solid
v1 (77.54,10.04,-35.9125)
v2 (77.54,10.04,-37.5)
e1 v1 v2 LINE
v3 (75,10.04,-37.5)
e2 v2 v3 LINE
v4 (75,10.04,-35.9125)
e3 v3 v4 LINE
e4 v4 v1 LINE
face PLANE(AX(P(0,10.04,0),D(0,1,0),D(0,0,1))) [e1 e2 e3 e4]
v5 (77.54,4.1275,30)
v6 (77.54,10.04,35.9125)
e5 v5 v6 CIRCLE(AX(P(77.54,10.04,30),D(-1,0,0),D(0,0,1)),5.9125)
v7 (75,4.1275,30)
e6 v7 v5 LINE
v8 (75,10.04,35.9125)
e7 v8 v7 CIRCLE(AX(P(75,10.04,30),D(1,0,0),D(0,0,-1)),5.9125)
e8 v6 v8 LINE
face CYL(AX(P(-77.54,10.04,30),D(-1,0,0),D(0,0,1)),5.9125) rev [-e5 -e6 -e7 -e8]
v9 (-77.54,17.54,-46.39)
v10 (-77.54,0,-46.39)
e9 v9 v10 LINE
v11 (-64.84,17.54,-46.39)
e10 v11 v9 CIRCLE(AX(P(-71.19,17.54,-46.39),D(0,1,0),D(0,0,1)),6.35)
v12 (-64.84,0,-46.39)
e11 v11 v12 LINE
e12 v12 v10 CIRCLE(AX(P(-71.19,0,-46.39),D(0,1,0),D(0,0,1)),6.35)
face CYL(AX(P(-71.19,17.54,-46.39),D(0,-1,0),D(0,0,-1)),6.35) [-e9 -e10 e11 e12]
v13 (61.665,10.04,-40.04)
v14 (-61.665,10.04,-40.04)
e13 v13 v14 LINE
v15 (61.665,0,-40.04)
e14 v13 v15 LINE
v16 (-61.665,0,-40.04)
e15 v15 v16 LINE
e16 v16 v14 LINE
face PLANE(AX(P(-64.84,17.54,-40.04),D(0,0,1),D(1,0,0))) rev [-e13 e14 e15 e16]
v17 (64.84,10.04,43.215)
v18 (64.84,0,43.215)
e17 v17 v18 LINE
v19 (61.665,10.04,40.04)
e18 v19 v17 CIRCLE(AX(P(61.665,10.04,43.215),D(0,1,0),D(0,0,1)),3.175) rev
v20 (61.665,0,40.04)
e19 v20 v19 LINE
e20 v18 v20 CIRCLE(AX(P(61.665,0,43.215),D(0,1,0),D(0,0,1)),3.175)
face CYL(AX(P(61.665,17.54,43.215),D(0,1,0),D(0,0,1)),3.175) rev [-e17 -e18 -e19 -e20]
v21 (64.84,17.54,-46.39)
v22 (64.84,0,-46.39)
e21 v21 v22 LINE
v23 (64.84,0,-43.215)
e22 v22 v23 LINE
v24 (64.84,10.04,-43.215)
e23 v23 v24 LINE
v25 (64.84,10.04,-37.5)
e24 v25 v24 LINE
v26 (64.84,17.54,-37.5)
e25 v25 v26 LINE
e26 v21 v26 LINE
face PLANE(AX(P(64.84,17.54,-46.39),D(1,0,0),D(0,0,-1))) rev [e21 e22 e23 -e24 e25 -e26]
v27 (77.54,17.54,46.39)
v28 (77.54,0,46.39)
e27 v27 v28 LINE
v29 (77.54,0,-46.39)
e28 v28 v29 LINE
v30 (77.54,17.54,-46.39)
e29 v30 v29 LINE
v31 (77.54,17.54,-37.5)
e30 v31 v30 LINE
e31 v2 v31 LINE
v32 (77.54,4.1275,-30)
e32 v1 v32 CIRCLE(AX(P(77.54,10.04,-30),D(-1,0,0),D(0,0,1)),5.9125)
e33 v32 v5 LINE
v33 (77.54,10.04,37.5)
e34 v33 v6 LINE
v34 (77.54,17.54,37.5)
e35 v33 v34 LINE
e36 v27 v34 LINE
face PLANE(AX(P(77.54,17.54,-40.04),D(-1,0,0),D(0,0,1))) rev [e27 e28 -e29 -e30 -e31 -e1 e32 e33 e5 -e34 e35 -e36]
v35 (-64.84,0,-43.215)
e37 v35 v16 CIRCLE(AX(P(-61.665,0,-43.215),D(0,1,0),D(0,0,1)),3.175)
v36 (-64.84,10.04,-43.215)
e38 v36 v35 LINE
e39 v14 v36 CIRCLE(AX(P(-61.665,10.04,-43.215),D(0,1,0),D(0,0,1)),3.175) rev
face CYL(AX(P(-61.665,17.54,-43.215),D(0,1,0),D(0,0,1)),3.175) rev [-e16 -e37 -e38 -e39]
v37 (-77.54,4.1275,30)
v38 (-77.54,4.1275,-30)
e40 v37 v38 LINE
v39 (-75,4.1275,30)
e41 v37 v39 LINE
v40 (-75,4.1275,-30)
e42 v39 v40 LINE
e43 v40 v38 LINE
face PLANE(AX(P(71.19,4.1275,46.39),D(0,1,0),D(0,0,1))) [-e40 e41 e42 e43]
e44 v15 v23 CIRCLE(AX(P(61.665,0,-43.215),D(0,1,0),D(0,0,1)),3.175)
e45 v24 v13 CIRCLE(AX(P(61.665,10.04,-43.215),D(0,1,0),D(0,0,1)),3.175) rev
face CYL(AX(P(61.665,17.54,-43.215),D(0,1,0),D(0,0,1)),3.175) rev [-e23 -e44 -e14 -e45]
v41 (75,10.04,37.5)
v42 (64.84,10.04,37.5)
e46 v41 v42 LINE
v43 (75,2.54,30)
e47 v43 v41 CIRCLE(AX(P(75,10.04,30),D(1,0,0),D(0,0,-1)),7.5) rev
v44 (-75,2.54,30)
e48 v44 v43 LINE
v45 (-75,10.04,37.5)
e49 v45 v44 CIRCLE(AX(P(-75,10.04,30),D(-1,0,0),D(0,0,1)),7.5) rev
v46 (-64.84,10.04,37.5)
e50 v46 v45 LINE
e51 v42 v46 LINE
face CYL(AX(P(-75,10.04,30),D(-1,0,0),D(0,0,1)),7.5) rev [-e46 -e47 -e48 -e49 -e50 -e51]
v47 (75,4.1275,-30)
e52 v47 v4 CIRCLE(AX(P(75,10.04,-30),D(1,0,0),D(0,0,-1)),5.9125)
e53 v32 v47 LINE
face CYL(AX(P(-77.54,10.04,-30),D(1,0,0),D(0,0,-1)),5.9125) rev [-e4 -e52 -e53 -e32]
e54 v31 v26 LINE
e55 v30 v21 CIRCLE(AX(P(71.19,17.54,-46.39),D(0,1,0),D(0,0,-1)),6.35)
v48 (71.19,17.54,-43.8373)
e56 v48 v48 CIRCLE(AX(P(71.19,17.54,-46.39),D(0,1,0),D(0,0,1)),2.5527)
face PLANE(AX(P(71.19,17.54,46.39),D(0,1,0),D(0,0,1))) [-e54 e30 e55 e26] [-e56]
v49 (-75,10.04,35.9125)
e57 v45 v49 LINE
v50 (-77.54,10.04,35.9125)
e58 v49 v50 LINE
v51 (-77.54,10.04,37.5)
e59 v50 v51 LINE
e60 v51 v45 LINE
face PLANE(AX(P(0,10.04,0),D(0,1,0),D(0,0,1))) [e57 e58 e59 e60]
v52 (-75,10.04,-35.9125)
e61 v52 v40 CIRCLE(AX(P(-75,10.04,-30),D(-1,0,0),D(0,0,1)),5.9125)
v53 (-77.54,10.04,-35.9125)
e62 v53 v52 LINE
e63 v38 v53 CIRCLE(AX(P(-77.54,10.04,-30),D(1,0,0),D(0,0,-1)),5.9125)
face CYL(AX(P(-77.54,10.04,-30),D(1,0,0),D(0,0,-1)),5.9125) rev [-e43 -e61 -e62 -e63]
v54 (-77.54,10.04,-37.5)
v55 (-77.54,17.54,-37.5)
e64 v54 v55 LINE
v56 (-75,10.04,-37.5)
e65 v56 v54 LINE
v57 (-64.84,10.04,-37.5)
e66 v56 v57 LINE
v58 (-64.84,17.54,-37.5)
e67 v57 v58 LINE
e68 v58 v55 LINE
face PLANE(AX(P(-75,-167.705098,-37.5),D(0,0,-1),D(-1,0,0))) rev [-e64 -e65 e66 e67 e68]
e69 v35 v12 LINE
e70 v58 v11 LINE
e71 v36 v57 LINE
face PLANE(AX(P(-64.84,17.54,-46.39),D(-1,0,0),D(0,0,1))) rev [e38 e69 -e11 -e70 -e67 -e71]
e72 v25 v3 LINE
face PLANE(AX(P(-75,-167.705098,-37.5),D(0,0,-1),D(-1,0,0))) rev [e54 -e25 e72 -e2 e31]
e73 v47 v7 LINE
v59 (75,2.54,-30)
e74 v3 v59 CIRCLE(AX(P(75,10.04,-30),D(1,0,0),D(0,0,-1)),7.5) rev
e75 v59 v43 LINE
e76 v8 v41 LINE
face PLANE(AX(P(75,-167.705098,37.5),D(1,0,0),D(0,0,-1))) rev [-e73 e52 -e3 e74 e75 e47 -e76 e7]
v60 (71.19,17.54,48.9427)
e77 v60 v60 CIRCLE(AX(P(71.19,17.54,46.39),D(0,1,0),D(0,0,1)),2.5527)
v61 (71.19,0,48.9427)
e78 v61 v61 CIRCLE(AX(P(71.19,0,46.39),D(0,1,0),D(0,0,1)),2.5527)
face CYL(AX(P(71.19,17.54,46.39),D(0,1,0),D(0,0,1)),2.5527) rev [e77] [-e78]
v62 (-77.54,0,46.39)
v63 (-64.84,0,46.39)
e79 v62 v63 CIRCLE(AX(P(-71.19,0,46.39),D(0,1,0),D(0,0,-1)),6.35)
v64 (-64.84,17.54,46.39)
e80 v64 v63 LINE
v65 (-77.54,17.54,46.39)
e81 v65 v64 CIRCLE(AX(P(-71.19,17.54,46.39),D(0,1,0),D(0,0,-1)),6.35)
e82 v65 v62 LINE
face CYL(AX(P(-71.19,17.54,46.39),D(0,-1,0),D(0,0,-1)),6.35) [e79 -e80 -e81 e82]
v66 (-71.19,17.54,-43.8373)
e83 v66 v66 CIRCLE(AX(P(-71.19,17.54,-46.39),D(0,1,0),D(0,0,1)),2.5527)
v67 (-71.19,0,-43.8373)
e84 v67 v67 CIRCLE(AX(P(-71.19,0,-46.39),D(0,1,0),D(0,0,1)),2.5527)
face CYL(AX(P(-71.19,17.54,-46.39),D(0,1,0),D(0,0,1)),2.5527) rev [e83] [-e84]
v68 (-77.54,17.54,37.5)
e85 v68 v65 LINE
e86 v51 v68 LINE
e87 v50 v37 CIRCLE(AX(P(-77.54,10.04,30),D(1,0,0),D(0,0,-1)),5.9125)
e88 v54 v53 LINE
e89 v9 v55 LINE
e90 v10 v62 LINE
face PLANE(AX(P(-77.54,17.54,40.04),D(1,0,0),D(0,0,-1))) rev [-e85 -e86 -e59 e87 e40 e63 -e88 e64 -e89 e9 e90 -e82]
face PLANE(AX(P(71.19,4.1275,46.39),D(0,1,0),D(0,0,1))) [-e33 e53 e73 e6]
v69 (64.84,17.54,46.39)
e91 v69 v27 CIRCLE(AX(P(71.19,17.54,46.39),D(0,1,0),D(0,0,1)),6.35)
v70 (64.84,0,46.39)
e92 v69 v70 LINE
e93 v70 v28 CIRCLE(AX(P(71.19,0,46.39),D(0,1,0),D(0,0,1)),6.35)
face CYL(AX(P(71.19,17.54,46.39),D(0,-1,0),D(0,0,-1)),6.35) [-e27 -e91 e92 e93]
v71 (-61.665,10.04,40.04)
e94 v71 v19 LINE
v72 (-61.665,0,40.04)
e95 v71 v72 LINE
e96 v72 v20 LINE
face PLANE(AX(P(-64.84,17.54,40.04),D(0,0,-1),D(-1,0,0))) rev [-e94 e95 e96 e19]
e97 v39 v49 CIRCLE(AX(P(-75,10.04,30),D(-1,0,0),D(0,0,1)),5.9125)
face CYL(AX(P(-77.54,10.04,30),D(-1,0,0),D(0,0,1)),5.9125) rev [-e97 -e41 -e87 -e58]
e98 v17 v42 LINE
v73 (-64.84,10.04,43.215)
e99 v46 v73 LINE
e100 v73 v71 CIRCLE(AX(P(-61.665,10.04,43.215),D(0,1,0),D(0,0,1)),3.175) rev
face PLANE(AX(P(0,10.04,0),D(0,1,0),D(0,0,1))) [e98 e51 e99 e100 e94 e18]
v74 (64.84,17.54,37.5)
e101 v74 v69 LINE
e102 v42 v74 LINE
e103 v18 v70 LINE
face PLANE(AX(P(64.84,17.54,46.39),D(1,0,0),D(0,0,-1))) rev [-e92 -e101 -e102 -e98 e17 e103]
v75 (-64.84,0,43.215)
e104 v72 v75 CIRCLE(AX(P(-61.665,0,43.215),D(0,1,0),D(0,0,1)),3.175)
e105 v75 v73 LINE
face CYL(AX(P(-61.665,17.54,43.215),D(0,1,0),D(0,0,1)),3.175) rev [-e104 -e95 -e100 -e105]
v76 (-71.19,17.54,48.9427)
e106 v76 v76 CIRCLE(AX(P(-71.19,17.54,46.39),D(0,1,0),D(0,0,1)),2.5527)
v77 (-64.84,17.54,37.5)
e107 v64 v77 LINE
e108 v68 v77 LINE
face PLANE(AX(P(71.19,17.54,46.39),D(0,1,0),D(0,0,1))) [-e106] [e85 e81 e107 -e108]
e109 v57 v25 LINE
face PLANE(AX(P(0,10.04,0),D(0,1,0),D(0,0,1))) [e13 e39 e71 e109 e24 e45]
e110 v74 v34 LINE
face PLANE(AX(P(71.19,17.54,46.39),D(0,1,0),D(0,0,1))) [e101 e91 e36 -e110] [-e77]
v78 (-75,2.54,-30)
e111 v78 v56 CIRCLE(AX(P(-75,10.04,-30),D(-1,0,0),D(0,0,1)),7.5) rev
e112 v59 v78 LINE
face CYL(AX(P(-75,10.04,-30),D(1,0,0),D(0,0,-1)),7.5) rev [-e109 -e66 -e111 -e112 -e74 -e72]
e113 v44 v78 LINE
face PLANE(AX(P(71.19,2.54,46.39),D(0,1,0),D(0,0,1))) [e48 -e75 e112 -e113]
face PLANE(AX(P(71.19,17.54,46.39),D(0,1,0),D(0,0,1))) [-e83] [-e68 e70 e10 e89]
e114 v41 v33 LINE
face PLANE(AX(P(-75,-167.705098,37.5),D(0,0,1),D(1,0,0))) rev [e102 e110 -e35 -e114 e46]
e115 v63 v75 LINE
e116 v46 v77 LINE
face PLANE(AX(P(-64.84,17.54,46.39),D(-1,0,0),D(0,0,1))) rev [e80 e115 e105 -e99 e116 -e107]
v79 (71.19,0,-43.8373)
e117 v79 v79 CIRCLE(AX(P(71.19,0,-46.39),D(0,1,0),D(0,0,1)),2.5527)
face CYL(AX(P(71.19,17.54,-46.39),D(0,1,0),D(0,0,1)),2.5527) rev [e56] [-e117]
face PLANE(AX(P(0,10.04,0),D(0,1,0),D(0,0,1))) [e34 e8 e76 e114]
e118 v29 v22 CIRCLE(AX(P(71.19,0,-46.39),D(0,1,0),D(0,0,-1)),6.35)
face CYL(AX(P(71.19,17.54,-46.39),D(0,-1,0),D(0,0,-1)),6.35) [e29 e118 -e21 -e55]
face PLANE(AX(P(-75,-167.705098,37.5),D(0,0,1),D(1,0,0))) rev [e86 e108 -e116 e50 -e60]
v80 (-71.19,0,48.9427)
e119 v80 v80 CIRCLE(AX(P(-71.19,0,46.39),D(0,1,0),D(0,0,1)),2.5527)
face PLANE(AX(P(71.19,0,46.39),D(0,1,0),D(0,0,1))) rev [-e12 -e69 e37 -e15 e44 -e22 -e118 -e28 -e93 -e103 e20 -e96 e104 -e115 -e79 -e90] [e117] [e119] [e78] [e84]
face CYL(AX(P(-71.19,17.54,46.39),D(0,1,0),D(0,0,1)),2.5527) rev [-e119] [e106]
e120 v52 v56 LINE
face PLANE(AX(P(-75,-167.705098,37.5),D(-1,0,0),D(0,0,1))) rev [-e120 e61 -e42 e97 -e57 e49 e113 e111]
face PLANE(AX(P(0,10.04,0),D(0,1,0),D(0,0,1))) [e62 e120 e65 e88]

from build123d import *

# Parameters (mm, degrees)
BOSS_EXTRUDE1_DEPTH    = 17.539999972
F_10_CLEARANCE_HOLE1_D = 5.1054
SKETCH3_W              = 150
SKETCH3_H              = 75
CUT_EXTRUDE1_DEPTH     = 14.999999972
SKETCH4_W              = 155.08
SKETCH4_H              = 71.825
CUT_EXTRUDE2_DEPTH     = 13.412499972
CUT_EXTRUDE3_DEPTH     = 7.5
FILLET2_R              = 5.9125
FILLET1_R              = 7.5
FILLET3_R              = 3.175


with BuildPart() as part:
    # Sketch1 → Boss-Extrude1 (new body)
    with BuildSketch(Plane(origin=(0, 0, 0), x_dir=(1, 0, 0), z_dir=(0, 1, 0))):
        with BuildLine():
            Line((77.54, -40.04), (77.54, 40.04))
            Line((77.54, 40.04), (77.54, 46.39))
            ThreePointArc((77.54, 46.39), (71.19, 52.74), (64.84, 46.39))
            Line((64.84, 46.39), (64.84, 40.04))
            Line((64.84, 40.04), (-64.84, 40.04))
            Line((-64.84, 40.04), (-64.84, 46.39))
            ThreePointArc((-64.84, 46.39), (-71.19, 52.74), (-77.54, 46.39))
            Line((-77.54, 46.39), (-77.54, 40.04))
            Line((-77.54, 40.04), (-77.54, -40.04))
            Line((-77.54, -40.04), (-77.54, -46.39))
            ThreePointArc((-77.54, -46.39), (-71.19, -52.74), (-64.84, -46.39))
            Line((-64.84, -46.39), (-64.84, -40.04))
            Line((-64.84, -40.04), (64.84, -40.04))
            Line((64.84, -40.04), (64.84, -46.39))
            ThreePointArc((64.84, -46.39), (71.19, -52.74), (77.54, -46.39))
            Line((77.54, -46.39), (77.54, -40.04))
        make_face()
    extrude(amount=BOSS_EXTRUDE1_DEPTH)

    # #10 Clearance Hole1 (through all)
    with Locations(Plane(origin=(0, 17.539999972, 0), x_dir=(1, 0, 0), z_dir=(0, 1, 0))):
        with Locations((-71.19, 46.39), (71.19, 46.39), (71.19, -46.39), (-71.19, -46.39)):
            Hole(F_10_CLEARANCE_HOLE1_D / 2)

    # Sketch3 → Cut-Extrude1 (cut)
    with BuildSketch(Plane(origin=(0, 17.539999972, 0), x_dir=(1, 0, 0), z_dir=(0, 1, 0))):
        Rectangle(SKETCH3_W, SKETCH3_H)
    extrude(amount=-CUT_EXTRUDE1_DEPTH, mode=Mode.SUBTRACT)

    # Sketch4 → Cut-Extrude2 (cut)
    with BuildSketch(Plane(origin=(0, 17.539999972, 0), x_dir=(1, 0, 0), z_dir=(0, 1, 0))):
        Rectangle(SKETCH4_W, SKETCH4_H)
    extrude(amount=-CUT_EXTRUDE2_DEPTH, mode=Mode.SUBTRACT)

    # Sketch8 → Cut-Extrude3 (cut)
    with BuildSketch(Plane(origin=(0, 17.539999972, 0), x_dir=(1, 0, 0), z_dir=(0, 1, 0))):
        Polygon((-77.54, 37.5), (-64.84, 37.5), (-64.84, 40.04), (64.84, 40.04), (64.84, 37.5), (77.54, 37.5), (77.54, -37.5), (64.84, -37.5), (64.84, -40.04), (-64.84, -40.04), (-64.84, -37.5), (-77.54, -37.5), align=None)
    extrude(amount=-CUT_EXTRUDE3_DEPTH, mode=Mode.SUBTRACT)

    # Fillet2
    fillet2_edges = [part.edges().sort_by_distance(p)[0] for p in [
        (-76.27, 4.1275, -35.9125),
        (-76.27, 4.1275, 35.9125),
        (76.27, 4.1275, 35.9125),
        (76.27, 4.1275, -35.9125),
    ]]
    fillet(fillet2_edges, radius=FILLET2_R - 0.0001)  # a hair under: the kernel refuses the full size

    # Fillet1
    fillet1_edges = [part.edges().sort_by_distance(p)[0] for p in [
        (0, 2.54, 37.5),
        (0, 2.54, -37.5),
    ]]
    fillet(fillet1_edges, radius=FILLET1_R - 0.0001)  # a hair under: the kernel refuses the full size

    # Fillet3
    fillet3_edges = [part.edges().sort_by_distance(p)[0] for p in [
        (64.84, 5.019999986, 40.04),
        (-64.84, 5.019999986, 40.04),
        (-64.84, 5.019999986, -40.04),
        (64.84, 5.019999986, -40.04),
    ]]
    fillet(fillet3_edges, radius=FILLET3_R)


solid = part.part
